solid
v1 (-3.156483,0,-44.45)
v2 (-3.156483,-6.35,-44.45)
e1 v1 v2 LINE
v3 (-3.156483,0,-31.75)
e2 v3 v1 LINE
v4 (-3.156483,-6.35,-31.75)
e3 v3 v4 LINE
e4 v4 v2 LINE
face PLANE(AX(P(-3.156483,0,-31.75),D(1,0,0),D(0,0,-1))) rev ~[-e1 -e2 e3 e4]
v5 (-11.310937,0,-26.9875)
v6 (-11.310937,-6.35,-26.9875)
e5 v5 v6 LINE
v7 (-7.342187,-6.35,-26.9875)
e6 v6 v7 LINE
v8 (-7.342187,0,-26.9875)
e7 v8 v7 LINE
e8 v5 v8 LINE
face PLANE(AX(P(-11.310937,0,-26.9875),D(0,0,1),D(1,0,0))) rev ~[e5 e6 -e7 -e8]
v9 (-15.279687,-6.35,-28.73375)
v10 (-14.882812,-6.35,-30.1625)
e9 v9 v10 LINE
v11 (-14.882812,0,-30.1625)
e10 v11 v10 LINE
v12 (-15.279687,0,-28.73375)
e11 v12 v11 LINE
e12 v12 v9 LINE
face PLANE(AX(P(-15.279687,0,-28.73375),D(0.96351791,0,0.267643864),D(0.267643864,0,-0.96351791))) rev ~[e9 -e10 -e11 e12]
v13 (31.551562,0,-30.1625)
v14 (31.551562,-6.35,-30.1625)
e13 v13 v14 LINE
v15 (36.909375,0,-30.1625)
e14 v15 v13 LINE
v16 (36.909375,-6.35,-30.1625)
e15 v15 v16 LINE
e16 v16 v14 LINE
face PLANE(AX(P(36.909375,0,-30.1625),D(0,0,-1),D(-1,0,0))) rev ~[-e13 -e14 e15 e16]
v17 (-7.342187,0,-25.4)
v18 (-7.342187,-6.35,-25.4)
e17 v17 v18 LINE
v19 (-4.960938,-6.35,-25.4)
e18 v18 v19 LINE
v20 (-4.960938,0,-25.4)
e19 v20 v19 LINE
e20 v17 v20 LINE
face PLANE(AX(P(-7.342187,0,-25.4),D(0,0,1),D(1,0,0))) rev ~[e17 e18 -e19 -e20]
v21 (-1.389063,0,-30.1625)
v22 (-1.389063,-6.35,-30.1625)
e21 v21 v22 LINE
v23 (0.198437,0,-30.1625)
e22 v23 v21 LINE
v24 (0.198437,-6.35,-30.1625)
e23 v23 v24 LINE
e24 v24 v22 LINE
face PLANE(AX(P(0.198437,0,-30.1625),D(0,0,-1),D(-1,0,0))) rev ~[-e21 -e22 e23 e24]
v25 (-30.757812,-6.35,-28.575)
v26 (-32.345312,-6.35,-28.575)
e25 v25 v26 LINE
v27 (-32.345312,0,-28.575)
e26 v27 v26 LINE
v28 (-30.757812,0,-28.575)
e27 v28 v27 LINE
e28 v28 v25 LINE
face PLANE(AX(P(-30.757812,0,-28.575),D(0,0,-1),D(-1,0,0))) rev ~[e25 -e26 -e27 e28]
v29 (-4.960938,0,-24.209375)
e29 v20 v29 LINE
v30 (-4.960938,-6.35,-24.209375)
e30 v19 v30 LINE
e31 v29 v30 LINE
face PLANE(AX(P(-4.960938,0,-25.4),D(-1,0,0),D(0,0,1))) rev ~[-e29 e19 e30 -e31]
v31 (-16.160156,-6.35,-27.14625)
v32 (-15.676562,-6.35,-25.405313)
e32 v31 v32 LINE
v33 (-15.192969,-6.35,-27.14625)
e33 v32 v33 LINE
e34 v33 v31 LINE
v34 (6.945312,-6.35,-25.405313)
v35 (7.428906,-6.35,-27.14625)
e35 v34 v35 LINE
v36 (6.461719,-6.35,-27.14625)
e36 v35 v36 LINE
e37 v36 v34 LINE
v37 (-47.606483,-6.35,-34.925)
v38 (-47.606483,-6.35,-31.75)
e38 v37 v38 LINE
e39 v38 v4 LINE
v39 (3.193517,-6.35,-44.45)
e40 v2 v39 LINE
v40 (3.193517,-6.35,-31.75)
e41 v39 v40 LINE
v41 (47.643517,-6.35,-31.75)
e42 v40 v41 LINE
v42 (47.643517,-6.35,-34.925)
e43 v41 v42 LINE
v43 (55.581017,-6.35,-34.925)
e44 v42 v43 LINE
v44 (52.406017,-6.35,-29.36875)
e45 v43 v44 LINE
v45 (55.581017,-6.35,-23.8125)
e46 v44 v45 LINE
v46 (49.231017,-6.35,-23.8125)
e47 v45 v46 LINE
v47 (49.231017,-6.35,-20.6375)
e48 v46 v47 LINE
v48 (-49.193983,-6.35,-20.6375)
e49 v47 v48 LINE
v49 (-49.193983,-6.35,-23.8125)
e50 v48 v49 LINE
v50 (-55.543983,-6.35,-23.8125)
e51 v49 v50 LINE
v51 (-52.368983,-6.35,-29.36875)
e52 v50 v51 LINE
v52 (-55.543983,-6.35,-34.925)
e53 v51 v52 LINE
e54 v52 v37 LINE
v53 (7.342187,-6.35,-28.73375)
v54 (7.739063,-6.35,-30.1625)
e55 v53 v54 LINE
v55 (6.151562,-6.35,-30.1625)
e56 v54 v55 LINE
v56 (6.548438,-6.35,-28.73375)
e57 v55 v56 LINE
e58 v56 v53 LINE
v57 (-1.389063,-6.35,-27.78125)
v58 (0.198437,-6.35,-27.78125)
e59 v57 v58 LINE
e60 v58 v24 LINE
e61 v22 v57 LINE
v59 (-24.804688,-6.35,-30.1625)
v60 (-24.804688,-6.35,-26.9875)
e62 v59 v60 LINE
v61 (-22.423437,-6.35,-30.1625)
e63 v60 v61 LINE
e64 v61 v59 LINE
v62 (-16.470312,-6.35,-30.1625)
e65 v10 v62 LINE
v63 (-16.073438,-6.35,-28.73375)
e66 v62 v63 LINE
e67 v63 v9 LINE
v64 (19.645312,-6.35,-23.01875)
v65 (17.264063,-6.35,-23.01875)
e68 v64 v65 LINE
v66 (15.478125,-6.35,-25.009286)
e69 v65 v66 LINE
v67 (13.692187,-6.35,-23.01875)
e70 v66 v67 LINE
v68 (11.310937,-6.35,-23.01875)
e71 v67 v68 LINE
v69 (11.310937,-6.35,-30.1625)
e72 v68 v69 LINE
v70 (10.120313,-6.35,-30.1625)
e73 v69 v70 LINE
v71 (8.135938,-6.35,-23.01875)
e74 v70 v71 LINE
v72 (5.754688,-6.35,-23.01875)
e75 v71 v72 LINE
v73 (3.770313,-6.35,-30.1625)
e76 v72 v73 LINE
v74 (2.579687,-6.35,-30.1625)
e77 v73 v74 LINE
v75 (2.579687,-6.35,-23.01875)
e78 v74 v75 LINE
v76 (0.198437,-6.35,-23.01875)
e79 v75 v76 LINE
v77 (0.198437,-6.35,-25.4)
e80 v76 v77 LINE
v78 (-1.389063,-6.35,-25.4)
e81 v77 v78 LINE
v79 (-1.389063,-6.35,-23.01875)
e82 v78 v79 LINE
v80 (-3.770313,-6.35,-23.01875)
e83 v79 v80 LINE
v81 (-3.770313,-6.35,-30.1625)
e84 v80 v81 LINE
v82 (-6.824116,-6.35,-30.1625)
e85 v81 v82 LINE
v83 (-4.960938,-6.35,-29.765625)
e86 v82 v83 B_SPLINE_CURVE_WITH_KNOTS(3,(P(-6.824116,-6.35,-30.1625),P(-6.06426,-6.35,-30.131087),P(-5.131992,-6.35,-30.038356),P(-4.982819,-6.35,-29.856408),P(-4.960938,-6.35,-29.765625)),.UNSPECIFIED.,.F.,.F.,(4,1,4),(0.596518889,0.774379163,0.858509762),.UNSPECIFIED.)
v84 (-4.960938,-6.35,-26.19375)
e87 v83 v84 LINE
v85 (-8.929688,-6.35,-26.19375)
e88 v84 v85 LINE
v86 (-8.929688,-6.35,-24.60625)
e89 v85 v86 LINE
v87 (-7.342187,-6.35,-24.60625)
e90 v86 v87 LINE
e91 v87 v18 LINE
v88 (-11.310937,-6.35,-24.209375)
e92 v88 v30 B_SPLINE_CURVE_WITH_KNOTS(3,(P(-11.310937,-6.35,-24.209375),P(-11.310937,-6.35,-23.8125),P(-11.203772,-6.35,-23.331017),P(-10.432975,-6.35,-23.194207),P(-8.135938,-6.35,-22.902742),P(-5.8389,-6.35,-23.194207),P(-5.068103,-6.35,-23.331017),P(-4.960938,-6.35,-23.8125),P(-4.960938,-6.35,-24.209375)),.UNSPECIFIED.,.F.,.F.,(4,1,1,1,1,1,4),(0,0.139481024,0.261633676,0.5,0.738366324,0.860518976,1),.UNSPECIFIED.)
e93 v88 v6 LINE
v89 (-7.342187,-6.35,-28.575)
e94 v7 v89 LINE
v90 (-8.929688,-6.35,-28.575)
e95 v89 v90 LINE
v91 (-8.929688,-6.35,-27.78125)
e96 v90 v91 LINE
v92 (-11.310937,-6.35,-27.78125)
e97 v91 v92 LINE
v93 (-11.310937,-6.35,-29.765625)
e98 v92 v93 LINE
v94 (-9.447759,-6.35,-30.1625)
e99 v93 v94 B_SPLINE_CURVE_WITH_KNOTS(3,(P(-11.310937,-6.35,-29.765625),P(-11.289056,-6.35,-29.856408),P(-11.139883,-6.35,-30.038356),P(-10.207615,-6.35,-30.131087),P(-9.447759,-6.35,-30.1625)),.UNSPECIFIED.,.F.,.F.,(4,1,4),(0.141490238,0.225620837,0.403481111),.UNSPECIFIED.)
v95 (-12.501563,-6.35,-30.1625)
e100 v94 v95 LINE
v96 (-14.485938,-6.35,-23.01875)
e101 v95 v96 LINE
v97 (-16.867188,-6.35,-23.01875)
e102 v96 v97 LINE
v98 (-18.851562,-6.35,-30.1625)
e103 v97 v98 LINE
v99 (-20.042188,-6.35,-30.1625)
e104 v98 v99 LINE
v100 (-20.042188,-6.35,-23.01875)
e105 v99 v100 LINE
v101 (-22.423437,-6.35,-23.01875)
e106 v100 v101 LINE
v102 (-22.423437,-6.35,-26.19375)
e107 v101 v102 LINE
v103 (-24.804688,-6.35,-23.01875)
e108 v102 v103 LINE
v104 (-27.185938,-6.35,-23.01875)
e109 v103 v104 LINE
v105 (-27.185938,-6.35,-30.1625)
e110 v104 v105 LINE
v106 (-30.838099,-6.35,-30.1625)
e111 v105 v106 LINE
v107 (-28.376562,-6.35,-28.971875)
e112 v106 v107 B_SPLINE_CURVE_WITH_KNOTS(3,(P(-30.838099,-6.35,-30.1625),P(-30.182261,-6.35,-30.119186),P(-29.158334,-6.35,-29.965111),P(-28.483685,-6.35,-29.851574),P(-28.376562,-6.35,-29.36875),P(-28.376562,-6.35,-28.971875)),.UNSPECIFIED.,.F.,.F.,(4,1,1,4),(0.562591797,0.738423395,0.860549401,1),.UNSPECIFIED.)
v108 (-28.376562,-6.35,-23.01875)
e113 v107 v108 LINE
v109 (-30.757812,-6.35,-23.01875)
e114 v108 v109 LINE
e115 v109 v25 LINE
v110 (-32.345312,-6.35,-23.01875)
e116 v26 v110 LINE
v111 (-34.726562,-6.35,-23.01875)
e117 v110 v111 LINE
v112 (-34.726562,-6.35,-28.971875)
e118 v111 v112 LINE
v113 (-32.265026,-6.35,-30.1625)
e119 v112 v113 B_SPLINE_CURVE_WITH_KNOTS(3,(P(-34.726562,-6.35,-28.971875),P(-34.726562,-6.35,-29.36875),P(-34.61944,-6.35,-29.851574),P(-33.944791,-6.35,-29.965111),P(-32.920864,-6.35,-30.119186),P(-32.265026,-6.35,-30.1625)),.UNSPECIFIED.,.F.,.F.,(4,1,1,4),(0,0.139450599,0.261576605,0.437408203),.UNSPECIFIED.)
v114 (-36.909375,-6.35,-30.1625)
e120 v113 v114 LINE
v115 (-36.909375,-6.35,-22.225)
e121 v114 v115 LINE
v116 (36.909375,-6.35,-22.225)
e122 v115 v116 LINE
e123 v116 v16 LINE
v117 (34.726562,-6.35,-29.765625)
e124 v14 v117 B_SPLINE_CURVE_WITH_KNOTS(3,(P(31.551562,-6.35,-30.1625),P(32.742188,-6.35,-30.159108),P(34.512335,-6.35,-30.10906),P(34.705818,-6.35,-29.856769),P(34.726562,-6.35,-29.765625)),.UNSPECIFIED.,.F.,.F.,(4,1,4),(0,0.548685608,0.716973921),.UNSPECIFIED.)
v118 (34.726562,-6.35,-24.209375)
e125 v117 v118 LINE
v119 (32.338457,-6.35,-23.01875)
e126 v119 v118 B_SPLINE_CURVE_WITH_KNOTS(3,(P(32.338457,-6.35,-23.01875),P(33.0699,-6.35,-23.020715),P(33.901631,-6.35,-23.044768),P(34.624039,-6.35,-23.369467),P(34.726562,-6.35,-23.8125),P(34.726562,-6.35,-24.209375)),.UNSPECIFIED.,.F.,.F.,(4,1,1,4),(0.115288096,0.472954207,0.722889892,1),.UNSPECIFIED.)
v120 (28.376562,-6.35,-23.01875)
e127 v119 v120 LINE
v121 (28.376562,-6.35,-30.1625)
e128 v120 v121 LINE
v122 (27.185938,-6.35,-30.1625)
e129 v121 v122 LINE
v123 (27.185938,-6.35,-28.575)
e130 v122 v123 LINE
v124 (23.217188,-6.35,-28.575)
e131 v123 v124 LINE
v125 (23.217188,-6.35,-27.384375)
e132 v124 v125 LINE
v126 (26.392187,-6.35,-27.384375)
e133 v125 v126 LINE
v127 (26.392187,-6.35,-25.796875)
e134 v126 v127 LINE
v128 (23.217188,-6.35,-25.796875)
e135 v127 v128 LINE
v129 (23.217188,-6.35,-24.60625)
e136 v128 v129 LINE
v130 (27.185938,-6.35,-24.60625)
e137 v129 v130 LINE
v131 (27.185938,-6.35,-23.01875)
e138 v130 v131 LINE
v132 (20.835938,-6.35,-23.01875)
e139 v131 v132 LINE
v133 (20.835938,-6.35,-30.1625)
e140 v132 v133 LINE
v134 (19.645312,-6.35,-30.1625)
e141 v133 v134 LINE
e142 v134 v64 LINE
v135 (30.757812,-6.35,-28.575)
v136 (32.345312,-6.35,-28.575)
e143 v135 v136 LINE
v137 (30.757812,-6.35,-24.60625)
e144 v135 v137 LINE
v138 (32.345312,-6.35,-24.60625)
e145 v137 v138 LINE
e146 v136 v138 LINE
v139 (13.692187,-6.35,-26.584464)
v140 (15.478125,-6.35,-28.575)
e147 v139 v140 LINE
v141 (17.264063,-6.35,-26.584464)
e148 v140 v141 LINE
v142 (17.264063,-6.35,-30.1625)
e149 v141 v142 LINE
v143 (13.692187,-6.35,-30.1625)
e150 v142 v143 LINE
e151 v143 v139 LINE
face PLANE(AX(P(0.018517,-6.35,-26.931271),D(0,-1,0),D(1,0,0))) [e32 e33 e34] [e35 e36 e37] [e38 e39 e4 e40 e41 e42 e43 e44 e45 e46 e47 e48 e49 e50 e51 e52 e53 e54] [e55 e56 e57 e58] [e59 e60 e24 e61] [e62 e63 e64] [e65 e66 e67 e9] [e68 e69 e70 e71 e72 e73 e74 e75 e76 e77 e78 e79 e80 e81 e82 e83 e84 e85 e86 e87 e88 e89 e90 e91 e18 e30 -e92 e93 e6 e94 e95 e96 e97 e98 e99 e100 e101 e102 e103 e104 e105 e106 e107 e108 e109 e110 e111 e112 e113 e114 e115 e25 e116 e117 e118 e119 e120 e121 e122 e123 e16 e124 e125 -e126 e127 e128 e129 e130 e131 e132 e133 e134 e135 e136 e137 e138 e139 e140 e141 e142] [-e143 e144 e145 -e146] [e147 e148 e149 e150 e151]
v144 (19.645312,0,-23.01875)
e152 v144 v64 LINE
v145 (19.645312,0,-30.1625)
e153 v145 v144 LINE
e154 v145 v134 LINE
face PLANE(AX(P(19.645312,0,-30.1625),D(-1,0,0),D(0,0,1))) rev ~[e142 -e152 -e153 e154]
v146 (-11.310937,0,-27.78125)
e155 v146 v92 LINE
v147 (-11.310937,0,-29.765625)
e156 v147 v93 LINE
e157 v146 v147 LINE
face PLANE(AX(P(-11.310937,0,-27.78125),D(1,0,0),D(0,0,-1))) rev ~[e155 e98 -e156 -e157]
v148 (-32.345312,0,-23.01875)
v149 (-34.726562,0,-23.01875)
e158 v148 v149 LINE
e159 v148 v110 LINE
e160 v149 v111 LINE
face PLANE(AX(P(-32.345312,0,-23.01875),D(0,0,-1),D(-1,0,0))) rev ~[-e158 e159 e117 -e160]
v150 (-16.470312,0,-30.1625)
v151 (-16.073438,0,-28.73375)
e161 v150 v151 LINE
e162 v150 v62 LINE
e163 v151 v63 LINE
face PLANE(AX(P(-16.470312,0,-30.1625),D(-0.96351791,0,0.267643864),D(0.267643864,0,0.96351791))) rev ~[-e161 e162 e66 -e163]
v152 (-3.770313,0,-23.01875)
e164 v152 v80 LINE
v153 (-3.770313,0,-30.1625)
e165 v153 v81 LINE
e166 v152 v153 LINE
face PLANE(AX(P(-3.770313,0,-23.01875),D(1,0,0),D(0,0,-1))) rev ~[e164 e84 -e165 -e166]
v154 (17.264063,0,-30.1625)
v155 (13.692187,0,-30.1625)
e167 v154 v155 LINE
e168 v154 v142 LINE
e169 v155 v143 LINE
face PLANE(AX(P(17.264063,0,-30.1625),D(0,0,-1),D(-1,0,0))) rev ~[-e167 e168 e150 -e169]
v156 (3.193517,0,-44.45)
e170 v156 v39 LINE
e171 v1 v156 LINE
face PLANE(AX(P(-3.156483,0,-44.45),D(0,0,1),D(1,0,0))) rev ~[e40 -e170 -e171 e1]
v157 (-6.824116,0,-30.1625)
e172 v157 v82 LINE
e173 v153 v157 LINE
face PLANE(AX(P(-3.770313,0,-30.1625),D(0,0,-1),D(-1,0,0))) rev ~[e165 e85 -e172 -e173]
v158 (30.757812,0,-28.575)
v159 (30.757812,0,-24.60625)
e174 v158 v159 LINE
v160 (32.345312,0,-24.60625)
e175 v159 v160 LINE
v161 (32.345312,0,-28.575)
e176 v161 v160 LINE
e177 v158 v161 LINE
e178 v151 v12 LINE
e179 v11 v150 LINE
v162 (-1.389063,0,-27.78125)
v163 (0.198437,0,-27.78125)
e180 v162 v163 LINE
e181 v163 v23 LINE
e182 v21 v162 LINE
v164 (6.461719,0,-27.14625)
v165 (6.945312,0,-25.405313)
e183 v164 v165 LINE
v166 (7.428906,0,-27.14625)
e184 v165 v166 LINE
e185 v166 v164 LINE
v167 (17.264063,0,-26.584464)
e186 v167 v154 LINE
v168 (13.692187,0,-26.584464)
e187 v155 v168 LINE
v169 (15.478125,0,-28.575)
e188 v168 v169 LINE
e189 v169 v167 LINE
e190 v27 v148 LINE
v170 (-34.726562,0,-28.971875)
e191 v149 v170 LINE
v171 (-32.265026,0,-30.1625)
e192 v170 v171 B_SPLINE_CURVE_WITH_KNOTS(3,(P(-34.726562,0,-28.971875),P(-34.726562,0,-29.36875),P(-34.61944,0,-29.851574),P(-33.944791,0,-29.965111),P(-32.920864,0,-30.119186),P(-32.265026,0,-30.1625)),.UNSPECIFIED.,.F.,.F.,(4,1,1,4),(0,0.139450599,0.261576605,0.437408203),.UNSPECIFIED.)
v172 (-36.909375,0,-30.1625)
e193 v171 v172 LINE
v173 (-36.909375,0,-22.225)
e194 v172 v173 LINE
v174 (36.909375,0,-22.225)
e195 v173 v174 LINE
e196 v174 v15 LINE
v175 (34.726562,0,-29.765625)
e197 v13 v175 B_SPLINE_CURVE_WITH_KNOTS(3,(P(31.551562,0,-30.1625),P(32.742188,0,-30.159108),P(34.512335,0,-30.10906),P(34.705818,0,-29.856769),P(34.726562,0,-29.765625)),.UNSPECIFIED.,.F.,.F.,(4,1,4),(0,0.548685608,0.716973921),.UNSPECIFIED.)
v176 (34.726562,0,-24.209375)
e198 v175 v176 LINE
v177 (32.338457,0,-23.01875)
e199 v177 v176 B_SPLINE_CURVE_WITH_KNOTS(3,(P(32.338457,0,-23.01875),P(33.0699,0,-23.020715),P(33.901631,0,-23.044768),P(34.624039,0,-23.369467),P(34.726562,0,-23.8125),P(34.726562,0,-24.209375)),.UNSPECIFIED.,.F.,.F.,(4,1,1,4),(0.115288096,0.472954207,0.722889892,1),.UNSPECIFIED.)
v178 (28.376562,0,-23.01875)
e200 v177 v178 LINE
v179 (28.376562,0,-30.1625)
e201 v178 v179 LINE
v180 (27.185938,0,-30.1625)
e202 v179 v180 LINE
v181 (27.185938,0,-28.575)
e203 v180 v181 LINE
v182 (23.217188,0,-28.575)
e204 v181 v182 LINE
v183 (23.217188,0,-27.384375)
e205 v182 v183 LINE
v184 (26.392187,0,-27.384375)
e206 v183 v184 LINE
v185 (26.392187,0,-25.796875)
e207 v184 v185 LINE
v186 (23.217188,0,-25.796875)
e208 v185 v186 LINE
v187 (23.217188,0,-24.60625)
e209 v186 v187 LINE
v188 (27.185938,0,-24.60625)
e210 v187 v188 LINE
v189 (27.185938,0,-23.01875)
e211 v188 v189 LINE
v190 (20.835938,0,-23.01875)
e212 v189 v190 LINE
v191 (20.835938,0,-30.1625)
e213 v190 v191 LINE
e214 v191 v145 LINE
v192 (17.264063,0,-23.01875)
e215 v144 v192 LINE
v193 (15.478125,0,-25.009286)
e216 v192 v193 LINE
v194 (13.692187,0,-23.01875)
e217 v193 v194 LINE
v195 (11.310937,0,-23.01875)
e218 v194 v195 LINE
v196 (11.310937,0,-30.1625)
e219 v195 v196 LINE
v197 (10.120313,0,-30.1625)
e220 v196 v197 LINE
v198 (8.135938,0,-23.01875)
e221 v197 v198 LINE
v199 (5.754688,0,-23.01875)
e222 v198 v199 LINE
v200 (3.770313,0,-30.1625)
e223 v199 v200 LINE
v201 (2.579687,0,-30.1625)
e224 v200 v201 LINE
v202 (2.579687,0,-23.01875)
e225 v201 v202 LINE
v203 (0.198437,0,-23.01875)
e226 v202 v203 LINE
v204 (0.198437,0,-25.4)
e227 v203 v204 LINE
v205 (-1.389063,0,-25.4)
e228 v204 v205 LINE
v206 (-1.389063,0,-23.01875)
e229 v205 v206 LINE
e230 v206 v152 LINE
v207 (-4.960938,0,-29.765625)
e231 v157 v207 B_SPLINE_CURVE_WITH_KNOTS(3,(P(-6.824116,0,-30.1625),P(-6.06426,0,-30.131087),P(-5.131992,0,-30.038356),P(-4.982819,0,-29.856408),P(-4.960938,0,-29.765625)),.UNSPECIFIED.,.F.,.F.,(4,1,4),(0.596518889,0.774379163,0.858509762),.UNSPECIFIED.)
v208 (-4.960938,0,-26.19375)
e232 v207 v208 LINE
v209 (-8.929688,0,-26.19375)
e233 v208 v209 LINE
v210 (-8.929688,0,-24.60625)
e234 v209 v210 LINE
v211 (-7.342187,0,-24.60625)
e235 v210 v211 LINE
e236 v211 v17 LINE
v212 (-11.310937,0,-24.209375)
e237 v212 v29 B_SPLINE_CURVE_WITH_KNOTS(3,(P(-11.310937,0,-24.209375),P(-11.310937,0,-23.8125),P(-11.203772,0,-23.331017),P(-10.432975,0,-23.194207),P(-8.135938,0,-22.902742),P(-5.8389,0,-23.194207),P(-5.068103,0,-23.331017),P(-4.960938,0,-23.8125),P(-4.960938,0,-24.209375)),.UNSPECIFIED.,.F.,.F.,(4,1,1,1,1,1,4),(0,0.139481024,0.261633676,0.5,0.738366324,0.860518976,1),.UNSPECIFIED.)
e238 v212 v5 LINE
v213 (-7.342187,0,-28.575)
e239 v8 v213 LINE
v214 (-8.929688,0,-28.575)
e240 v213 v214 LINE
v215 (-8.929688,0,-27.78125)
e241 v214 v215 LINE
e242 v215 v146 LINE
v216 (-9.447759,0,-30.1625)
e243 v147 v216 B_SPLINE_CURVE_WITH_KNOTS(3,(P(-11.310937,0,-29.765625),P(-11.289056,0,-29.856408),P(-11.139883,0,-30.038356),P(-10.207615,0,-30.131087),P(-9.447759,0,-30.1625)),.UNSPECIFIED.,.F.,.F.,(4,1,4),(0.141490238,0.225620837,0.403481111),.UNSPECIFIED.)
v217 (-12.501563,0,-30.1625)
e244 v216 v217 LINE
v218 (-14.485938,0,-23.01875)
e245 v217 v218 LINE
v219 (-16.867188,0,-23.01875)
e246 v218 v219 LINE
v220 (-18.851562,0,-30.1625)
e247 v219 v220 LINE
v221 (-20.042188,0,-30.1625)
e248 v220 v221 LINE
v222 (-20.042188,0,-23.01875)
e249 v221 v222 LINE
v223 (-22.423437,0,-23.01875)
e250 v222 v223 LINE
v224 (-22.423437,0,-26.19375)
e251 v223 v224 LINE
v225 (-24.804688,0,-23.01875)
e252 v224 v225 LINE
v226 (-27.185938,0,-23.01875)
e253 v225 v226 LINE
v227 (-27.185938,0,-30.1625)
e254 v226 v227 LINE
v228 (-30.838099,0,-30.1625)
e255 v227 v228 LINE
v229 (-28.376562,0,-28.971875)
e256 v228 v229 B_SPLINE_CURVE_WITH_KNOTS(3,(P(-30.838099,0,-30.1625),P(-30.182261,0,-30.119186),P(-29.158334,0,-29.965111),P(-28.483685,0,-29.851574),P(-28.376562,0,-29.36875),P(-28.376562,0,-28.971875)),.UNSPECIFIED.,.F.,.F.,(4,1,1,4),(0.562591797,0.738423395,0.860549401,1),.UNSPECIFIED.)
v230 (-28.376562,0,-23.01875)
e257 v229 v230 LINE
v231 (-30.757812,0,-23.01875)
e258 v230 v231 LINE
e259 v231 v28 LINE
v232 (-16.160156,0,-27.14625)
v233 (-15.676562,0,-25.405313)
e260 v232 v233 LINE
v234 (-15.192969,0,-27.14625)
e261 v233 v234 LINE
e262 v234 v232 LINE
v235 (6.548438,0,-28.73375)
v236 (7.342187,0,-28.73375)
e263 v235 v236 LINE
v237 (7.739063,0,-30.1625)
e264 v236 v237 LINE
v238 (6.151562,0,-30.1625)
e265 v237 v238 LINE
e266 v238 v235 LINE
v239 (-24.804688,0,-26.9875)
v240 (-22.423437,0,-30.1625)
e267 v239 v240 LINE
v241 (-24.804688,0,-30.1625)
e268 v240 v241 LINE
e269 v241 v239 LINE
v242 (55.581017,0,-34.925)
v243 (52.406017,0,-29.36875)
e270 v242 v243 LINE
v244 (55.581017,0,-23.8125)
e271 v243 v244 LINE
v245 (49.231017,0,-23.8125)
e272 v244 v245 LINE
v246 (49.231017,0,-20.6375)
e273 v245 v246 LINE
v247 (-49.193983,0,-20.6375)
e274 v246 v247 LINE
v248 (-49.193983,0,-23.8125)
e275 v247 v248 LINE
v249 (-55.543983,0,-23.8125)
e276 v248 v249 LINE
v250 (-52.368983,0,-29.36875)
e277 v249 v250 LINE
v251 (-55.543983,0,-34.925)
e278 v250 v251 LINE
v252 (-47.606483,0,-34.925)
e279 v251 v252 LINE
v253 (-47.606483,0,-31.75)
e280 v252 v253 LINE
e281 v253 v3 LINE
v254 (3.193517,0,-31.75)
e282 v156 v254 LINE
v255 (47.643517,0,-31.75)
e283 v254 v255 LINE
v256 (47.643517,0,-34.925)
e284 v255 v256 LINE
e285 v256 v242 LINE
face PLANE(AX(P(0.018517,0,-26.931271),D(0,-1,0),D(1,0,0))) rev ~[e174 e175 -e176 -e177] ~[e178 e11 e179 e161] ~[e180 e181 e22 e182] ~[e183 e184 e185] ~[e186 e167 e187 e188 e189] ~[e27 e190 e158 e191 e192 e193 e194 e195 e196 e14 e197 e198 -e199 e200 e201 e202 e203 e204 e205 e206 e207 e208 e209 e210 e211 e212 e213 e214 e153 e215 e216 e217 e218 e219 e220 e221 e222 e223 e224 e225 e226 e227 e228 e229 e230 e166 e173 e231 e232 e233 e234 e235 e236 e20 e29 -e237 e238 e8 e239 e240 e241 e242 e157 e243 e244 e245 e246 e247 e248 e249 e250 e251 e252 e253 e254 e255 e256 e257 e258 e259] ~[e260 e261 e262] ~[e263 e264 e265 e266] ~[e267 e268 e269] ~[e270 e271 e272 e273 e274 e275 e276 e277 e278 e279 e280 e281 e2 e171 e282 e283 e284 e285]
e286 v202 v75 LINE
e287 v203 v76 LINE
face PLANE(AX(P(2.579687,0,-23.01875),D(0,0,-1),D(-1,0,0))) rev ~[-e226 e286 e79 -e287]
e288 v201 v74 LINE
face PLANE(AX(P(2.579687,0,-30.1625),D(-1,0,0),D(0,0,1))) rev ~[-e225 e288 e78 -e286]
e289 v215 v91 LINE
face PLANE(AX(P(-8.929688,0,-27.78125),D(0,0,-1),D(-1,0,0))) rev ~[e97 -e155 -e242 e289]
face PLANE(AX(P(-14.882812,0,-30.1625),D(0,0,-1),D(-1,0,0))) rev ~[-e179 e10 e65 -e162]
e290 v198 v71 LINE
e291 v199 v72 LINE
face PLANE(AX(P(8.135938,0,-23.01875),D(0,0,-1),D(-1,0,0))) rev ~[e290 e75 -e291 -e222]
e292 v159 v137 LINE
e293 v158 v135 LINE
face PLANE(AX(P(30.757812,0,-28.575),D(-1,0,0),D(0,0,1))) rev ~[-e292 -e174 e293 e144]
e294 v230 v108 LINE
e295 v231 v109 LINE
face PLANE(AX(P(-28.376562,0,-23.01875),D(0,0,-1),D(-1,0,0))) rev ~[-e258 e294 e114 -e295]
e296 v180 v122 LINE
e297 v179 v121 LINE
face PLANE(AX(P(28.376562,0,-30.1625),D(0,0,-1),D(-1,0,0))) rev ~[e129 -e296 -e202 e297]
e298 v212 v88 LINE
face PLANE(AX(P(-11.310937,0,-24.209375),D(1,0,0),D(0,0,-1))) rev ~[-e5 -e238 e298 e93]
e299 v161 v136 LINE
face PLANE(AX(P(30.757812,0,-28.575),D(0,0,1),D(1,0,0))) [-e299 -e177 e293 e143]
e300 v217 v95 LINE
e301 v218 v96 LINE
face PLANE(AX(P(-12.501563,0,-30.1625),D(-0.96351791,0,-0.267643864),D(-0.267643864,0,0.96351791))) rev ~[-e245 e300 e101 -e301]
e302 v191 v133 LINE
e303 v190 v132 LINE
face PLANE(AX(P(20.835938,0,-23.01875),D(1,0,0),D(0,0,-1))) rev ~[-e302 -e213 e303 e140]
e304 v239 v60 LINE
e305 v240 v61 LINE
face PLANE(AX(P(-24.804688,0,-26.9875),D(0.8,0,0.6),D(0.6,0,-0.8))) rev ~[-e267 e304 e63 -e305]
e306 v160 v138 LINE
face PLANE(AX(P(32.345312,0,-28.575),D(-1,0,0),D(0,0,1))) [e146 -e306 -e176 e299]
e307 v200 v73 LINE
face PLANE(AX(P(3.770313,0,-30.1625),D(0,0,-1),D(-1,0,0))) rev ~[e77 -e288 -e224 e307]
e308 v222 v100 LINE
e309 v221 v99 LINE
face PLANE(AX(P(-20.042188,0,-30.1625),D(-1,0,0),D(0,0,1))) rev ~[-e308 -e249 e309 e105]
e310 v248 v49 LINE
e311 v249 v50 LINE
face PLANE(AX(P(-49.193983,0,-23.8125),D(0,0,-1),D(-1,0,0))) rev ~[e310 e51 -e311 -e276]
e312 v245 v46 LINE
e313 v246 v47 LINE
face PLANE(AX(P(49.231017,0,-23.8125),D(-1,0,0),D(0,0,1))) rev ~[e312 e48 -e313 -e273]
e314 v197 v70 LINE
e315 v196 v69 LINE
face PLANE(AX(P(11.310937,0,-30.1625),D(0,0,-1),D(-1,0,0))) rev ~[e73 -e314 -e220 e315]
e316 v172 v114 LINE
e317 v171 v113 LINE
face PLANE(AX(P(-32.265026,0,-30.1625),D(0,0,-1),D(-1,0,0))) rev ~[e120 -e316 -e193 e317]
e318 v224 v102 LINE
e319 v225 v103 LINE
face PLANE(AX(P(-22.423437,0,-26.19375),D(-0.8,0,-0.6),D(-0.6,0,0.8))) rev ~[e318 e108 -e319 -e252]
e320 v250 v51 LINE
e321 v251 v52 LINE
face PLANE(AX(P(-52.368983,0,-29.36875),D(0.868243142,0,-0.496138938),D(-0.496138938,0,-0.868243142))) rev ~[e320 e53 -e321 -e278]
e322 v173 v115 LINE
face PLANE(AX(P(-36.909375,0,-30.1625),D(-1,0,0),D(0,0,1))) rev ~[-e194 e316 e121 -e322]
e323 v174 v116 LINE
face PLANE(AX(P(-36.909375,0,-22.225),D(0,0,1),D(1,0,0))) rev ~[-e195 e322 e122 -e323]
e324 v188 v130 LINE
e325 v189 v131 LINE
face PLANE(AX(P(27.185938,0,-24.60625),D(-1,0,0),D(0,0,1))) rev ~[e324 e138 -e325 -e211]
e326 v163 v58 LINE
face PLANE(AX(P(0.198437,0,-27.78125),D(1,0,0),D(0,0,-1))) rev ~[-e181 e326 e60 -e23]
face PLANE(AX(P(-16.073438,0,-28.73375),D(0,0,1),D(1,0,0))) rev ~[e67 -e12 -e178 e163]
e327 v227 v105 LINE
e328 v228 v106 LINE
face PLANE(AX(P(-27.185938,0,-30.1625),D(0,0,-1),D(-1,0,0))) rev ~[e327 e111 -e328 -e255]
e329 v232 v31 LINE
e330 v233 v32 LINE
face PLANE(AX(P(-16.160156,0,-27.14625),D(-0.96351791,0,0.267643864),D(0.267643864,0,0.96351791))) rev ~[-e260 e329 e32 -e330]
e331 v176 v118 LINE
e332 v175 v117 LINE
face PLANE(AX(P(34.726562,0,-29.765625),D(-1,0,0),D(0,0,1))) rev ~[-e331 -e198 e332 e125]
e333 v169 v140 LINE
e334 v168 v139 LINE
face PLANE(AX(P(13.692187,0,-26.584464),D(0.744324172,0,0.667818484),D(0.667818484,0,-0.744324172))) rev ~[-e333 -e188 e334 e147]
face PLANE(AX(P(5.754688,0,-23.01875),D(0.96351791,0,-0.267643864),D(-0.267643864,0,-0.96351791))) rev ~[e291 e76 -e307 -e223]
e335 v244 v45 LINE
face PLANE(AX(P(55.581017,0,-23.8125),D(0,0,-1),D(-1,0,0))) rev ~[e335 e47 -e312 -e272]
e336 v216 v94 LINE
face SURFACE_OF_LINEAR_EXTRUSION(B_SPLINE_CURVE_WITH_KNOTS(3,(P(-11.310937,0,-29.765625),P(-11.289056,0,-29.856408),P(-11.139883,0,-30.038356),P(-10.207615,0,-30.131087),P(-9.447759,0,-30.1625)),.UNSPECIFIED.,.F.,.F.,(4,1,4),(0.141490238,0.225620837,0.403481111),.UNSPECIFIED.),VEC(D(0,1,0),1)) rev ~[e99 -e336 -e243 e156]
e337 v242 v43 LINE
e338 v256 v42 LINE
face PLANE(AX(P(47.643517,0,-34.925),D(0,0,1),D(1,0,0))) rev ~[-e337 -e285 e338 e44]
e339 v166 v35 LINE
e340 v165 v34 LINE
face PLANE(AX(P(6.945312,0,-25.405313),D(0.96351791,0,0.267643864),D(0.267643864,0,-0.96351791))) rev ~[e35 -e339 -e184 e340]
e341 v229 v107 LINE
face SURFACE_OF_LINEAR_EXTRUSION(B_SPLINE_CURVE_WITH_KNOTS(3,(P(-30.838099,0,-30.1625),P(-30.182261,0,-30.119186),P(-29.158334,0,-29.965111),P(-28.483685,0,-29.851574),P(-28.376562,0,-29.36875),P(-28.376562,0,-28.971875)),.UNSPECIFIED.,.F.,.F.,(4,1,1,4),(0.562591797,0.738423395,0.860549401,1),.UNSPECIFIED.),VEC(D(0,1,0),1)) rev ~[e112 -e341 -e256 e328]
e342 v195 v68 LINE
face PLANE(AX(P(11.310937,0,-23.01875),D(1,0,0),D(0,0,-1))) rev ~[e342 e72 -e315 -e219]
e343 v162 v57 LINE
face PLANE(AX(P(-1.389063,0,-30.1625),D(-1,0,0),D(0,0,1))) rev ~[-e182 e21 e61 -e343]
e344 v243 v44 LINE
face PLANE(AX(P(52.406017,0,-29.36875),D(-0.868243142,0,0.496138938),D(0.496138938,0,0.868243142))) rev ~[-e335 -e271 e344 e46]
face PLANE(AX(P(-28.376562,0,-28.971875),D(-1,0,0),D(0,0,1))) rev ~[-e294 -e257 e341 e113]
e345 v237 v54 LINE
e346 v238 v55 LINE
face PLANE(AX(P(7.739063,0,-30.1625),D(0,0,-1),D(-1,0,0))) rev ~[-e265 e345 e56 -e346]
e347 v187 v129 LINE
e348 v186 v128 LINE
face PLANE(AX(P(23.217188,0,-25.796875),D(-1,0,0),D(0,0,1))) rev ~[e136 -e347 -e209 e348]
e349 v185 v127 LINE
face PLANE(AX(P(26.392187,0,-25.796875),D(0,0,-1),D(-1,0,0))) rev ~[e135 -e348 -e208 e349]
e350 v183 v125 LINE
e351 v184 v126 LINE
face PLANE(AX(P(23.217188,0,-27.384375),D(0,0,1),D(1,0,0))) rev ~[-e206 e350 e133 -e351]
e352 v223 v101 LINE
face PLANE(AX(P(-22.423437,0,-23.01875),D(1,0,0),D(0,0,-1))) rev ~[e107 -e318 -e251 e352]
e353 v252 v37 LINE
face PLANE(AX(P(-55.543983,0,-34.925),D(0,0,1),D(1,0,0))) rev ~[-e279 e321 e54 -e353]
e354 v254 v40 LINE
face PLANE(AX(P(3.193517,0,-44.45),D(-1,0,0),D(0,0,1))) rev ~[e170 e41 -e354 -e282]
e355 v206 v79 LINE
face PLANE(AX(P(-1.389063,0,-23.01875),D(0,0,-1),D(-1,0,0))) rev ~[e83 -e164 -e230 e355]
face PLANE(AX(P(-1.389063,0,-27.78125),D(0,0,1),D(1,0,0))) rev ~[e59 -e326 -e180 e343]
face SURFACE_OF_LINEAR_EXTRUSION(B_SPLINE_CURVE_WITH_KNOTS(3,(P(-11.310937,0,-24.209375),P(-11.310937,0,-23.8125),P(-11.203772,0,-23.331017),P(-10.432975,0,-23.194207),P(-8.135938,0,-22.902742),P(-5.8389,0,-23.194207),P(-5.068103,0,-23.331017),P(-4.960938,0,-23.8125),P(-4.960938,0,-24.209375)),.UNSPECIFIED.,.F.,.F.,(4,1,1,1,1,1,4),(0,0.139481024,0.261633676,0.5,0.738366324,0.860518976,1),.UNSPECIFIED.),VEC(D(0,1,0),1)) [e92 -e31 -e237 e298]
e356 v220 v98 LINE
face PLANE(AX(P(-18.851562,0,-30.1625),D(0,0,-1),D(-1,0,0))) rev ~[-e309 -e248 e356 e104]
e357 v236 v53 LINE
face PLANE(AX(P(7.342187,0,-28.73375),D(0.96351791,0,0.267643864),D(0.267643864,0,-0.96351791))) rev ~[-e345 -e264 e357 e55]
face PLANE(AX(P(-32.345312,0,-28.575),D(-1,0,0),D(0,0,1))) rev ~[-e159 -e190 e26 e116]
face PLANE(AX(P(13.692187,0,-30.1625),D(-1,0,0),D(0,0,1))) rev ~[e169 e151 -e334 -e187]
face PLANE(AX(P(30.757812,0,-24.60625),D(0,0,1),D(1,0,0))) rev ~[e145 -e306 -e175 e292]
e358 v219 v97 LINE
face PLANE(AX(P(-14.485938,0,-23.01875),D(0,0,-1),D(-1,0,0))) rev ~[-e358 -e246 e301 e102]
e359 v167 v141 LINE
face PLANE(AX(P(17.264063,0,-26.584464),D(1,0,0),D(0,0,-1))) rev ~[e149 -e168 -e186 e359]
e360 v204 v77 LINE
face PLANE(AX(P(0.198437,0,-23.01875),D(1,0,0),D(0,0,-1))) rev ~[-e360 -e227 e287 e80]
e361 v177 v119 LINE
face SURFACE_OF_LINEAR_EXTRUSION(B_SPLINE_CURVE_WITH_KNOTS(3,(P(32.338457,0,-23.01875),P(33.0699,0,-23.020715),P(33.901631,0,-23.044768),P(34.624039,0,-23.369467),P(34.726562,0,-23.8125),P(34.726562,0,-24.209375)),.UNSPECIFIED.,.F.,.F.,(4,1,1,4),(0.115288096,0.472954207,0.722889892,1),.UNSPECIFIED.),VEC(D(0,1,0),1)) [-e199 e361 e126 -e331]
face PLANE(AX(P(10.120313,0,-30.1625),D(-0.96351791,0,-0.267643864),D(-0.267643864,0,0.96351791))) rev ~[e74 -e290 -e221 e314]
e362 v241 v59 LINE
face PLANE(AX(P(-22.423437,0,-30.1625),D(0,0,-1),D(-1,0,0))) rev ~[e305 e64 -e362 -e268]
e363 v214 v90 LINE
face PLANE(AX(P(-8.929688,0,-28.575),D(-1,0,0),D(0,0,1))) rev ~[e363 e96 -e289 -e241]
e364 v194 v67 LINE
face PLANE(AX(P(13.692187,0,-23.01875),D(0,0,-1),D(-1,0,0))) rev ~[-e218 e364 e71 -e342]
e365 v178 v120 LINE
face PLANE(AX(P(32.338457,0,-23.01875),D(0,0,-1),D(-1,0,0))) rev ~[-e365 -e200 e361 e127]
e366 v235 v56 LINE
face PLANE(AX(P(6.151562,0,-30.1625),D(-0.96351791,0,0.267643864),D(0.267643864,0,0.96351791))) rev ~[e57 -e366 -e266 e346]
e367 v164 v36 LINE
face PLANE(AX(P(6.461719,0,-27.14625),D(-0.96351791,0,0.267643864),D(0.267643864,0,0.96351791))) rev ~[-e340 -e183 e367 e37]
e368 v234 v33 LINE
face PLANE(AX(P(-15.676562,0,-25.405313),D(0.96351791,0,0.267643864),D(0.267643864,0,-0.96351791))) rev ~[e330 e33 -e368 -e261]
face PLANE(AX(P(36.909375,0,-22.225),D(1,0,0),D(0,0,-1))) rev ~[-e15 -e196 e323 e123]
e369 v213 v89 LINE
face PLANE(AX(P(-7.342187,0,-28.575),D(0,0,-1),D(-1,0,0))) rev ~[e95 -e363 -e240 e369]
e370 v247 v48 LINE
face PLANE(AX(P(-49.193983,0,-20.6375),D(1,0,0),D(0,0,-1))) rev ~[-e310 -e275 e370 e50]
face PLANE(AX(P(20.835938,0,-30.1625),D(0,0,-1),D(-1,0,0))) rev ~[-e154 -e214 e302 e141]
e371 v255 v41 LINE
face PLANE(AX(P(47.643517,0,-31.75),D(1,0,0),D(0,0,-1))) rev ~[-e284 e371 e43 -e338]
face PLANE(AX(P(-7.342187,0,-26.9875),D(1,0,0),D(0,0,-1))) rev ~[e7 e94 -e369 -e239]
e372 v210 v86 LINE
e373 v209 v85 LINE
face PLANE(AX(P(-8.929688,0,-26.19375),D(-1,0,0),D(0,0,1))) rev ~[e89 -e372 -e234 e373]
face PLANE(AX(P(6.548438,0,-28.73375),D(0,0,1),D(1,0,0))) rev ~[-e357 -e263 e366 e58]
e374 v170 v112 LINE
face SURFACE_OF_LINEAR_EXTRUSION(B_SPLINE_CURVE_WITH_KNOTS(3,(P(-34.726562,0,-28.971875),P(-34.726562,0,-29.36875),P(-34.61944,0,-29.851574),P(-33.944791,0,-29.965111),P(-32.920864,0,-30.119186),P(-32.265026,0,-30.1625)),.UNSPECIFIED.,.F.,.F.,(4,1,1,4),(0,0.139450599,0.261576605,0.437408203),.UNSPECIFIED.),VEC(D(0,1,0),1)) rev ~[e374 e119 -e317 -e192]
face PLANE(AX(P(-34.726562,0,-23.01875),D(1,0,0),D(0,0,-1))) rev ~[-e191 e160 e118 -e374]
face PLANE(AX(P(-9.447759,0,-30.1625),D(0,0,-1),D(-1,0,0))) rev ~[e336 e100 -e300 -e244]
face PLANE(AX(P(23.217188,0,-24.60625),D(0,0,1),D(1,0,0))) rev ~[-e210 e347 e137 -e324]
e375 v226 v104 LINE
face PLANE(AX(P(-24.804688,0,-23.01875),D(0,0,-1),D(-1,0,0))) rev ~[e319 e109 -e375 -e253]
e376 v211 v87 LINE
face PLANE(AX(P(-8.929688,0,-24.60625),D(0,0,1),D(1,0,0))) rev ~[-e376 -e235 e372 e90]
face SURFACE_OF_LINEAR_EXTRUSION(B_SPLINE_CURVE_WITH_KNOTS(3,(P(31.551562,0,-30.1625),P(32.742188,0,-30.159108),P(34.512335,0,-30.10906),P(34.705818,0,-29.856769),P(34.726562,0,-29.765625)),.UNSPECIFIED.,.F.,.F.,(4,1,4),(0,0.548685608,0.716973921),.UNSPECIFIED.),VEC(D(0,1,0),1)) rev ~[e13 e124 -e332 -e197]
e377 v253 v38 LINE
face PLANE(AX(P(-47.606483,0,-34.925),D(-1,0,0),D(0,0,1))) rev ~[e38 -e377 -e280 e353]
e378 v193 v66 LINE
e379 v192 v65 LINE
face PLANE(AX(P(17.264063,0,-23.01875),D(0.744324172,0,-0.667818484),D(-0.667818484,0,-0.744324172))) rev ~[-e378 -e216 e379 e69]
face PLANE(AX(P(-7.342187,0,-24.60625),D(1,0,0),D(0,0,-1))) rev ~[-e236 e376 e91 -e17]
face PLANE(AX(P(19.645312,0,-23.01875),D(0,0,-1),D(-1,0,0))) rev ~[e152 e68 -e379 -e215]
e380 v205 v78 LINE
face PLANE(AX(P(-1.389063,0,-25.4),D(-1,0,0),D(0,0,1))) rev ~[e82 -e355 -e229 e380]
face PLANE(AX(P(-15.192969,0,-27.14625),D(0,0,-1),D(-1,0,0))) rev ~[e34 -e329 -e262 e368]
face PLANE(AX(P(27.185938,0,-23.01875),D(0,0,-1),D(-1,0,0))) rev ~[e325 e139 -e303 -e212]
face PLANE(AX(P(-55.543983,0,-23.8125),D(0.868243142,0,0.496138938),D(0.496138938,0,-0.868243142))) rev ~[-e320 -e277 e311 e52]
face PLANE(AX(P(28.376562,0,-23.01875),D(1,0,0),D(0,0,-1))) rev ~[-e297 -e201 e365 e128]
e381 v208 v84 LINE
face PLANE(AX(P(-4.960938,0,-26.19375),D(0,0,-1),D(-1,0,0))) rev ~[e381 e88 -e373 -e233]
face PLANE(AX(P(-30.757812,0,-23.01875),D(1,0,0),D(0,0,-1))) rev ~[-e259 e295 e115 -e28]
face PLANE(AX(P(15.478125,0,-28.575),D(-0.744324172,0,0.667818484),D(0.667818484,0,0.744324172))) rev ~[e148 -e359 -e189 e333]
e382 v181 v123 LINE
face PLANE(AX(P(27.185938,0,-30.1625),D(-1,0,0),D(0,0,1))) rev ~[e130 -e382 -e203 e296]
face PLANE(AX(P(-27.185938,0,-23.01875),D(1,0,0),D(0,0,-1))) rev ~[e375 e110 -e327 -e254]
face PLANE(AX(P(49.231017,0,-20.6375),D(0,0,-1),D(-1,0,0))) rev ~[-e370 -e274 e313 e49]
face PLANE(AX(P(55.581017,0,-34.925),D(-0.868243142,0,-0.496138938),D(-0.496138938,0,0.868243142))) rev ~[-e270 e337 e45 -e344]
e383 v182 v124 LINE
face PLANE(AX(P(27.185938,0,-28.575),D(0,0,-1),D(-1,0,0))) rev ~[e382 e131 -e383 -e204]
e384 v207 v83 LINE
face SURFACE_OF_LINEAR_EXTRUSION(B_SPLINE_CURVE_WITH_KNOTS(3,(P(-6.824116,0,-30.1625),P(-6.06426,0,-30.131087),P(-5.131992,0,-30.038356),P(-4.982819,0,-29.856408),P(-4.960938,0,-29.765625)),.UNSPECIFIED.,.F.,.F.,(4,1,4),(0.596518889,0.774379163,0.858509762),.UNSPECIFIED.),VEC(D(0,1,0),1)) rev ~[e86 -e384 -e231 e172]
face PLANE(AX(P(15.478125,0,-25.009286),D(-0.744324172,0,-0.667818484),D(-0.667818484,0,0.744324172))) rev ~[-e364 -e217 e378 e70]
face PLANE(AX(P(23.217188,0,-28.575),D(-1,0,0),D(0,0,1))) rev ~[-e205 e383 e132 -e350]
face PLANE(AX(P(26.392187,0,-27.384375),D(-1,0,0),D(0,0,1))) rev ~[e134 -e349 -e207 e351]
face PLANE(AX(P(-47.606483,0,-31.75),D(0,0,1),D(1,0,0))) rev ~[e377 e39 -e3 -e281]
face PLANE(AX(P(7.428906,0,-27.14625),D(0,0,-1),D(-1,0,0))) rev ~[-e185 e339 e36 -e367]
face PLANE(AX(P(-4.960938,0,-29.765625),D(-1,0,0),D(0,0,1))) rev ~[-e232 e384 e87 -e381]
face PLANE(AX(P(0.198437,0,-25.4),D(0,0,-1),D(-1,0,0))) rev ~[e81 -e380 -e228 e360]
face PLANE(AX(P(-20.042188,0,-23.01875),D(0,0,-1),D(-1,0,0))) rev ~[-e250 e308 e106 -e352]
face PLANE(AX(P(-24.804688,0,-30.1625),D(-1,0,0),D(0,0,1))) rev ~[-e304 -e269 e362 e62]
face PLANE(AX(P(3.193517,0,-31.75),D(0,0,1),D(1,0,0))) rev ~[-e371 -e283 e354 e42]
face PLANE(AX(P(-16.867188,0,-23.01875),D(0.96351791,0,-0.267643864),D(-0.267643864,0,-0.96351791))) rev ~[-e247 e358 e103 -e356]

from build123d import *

# Parameters (mm, degrees)
F0_W     = 6.35
F0_H     = 9.525
F0_W_2   = 1.5875
F0_H_2   = 3.96875
F0_H_3   = 3.175
F1_DEPTH = 6.35


# Not quite as in the source:
# - a length typed as a fraction of an inch, garbled in the dataset ("3 / 203.2 mm" for 3/8 in), is restored


with BuildPart() as f1:
    # F0 (on Front) → F1 (new body)
    with BuildSketch(Plane.XZ):
        Polygon((52.4060167908, -29.36875), (55.5810167908, -23.8125), (49.2310167908, -23.8125), (49.2310167908, -20.6375), (-49.1939832092, -20.6375), (-49.1939832092, -23.8125), (-55.5439832092, -23.8125), (-52.3689832092, -29.36875), (-55.5439832092, -34.925), (-47.6064832092, -34.925), (-47.6064832092, -31.75), (-3.1564832092, -31.75), (3.1935167908, -31.75), (47.6435167908, -31.75), (47.6435167908, -34.925), (55.5810167908, -34.925), align=None)
        with BuildLine():
            Line((-36.909375, -22.225), (36.909375, -22.225))
            Line((36.909375, -22.225), (36.909375, -30.1625))
            Line((36.909375, -30.1625), (34.7265625, -30.1625))
            Line((34.7265625, -30.1625), (31.5515625, -30.1625))
            Line((31.5515625, -30.1625), (28.3765625, -30.1625))
            Line((28.3765625, -30.1625), (27.1859375, -30.1625))
            Line((27.1859375, -30.1625), (20.8359375, -30.1625))
            Line((20.8359375, -30.1625), (19.6453125, -30.1625))
            Line((19.6453125, -30.1625), (17.2640625, -30.1625))
            Line((17.2640625, -30.1625), (13.6921875, -30.1625))
            Line((13.6921875, -30.1625), (11.3109375, -30.1625))
            Line((11.3109375, -30.1625), (10.1203125, -30.1625))
            Line((10.1203125, -30.1625), (7.7390625, -30.1625))
            Line((7.7390625, -30.1625), (6.1515625, -30.1625))
            Line((6.1515625, -30.1625), (3.7703125, -30.1625))
            Line((3.7703125, -30.1625), (2.5796875, -30.1625))
            Line((2.5796875, -30.1625), (0.1984375, -30.1625))
            Line((0.1984375, -30.1625), (-1.3890625, -30.1625))
            Line((-1.3890625, -30.1625), (-3.7703125, -30.1625))
            Line((-3.7703125, -30.1625), (-4.9609375, -30.1625))
            Line((-4.9609375, -30.1625), (-6.8241157772, -30.1625))
            add(Edge.make_bspline(
                [(-8.1359375, -30.1873046875), (-7.6862010464, -30.1873046875), (-7.2364645928, -30.1795465798), (-6.8241157772, -30.1625)],
                knots=[0.5, 0.5, 0.5, 0.5, 0.5965188889, 0.5965188889, 0.5965188889, 0.5965188889], degree=3))
            add(Edge.make_bspline(
                [(-9.4477592243, -30.1625), (-9.0354104083, -30.1795465799), (-8.5856739541, -30.1873046875), (-8.1359375, -30.1873046875)],
                knots=[0.403481111, 0.403481111, 0.403481111, 0.403481111, 0.5, 0.5, 0.5, 0.5], degree=3))
            Line((-9.4477592243, -30.1625), (-11.3109375, -30.1625))
            Line((-11.3109375, -30.1625), (-12.5015625, -30.1625))
            Line((-12.5015625, -30.1625), (-14.8828125, -30.1625))
            Line((-14.8828125, -30.1625), (-16.4703125, -30.1625))
            Line((-16.4703125, -30.1625), (-18.8515625, -30.1625))
            Line((-18.8515625, -30.1625), (-20.0421875, -30.1625))
            Line((-20.0421875, -30.1625), (-22.4234375, -30.1625))
            Line((-22.4234375, -30.1625), (-24.8046875, -30.1625))
            Line((-24.8046875, -30.1625), (-27.1859375, -30.1625))
            Line((-27.1859375, -30.1625), (-28.3765625, -30.1625))
            Line((-28.3765625, -30.1625), (-30.8380988479, -30.1625))
            add(Edge.make_bspline(
                [(-31.5515625, -30.1873046875), (-31.3115619086, -30.1873046875), (-31.0715613172, -30.1779187981), (-30.8380988479, -30.1625)],
                knots=[0.5, 0.5, 0.5, 0.5, 0.5625917967, 0.5625917967, 0.5625917967, 0.5625917967], degree=3))
            add(Edge.make_bspline(
                [(-32.2650261503, -30.1625), (-32.0315636815, -30.177918798), (-31.7915630907, -30.1873046875), (-31.5515625, -30.1873046875)],
                knots=[0.4374082034, 0.4374082034, 0.4374082034, 0.4374082034, 0.5, 0.5, 0.5, 0.5], degree=3))
            Line((-32.2650261503, -30.1625), (-34.7265625, -30.1625))
            Line((-34.7265625, -30.1625), (-36.909375, -30.1625))
            Line((-36.909375, -30.1625), (-36.909375, -22.225))
        make_face(mode=Mode.SUBTRACT)
        with Locations((0.0185167908, -39.6875)):
            Rectangle(F0_W, F0_H)
        Polygon((17.2640625, -30.1625), (19.6453125, -30.1625), (19.6453125, -23.01875), (17.2640625, -23.01875), (15.478125, -25.0092855764), (13.6921875, -23.01875), (11.3109375, -23.01875), (11.3109375, -30.1625), (13.6921875, -30.1625), (13.6921875, -26.5844644236), (15.478125, -28.575), (17.2640625, -26.5844644236), align=None)
        with BuildLine():
            Line((28.3765625, -30.1625), (31.5515625, -30.1625))
            add(Edge.make_bspline(
                [(31.5515625, -30.1625), (32.7421875004, -30.1591077376), (34.5123349703, -30.1090597393), (34.7058178423, -29.8567694785), (34.7265625, -29.765625)],
                knots=[0, 0, 0, 0, 0.5486856078, 0.7169739211, 0.7169739211, 0.7169739211, 0.7169739211], degree=3))
            Line((34.7265625, -29.765625), (34.7265625, -28.971875))
            Line((34.7265625, -28.971875), (34.7265625, -24.209375))
            add(Edge.make_bspline(
                [(32.338456939, -23.01875), (33.0698998056, -23.0207151841), (33.9016308923, -23.0447678149), (34.6240389102, -23.3694667004), (34.7265625, -23.8125000002), (34.7265625, -24.209375)],
                knots=[0.1152880959, 0.1152880959, 0.1152880959, 0.1152880959, 0.4729542068, 0.722889892, 1, 1, 1, 1], degree=3))
            Line((32.338456939, -23.01875), (31.5515625, -23.01875))
            Line((31.5515625, -23.01875), (28.3765625, -23.01875))
            Line((28.3765625, -23.01875), (28.3765625, -30.1625))
        make_face()
        with Locations((31.5515625, -26.590625)):
            Rectangle(F0_W_2, F0_H_2, mode=Mode.SUBTRACT)
        Polygon((-27.1859375, -23.01875), (-27.1859375, -30.1625), (-24.8046875, -30.1625), (-24.8046875, -26.9875), (-22.4234375, -30.1625), (-20.0421875, -30.1625), (-20.0421875, -23.01875), (-22.4234375, -23.01875), (-22.4234375, -26.19375), (-24.8046875, -23.01875), align=None)
        Polygon((0.1984375, -30.1625), (2.5796875, -30.1625), (2.5796875, -23.01875), (0.1984375, -23.01875), (0.1984375, -25.4), (-1.3890625, -25.4), (-1.3890625, -23.01875), (-3.7703125, -23.01875), (-3.7703125, -30.1625), (-1.3890625, -30.1625), (-1.3890625, -27.78125), (0.1984375, -27.78125), align=None)
        with BuildLine():
            add(Edge.make_bspline(
                [(-34.7265625, -28.971875), (-34.7265625, -29.3687499998), (-34.6194398399, -29.8515743848), (-33.9447907089, -29.9651114553), (-32.920864157, -30.119185827), (-32.2650261503, -30.1625)],
                knots=[0, 0, 0, 0, 0.139450599, 0.2615766049, 0.4374082034, 0.4374082034, 0.4374082034, 0.4374082034], degree=3))
            Line((-32.2650261503, -30.1625), (-31.5515625, -30.1625))
            Line((-31.5515625, -30.1625), (-30.8380988479, -30.1625))
            add(Edge.make_bspline(
                [(-30.8380988479, -30.1625), (-30.1822608419, -30.119185827), (-29.1583342909, -29.9651114555), (-28.4836851601, -29.851574384), (-28.3765625, -29.3687500019), (-28.3765625, -28.971875)],
                knots=[0.5625917967, 0.5625917967, 0.5625917967, 0.5625917967, 0.7384233951, 0.860549401, 1, 1, 1, 1], degree=3))
            Line((-28.3765625, -28.971875), (-28.3765625, -23.01875))
            Line((-28.3765625, -23.01875), (-30.7578125, -23.01875))
            Line((-30.7578125, -23.01875), (-30.7578125, -28.575))
            Line((-30.7578125, -28.575), (-32.3453125, -28.575))
            Line((-32.3453125, -28.575), (-32.3453125, -23.01875))
            Line((-32.3453125, -23.01875), (-34.7265625, -23.01875))
            Line((-34.7265625, -23.01875), (-34.7265625, -28.971875))
        make_face()
        with BuildLine():
            add(Edge.make_bspline(
                [(-11.3109375, -29.765625), (-11.2890563147, -29.8564083098), (-11.1398834343, -30.0383555662), (-10.2076153949, -30.1310873988), (-9.4477592243, -30.1625)],
                knots=[0.1414902381, 0.1414902381, 0.1414902381, 0.1414902381, 0.2256208371, 0.403481111, 0.403481111, 0.403481111, 0.403481111], degree=3))
            Line((-9.4477592243, -30.1625), (-8.1359375, -30.1625))
            Line((-8.1359375, -30.1625), (-6.8241157772, -30.1625))
            add(Edge.make_bspline(
                [(-6.8241157772, -30.1625), (-6.0642596059, -30.1310873988), (-5.1319915657, -30.0383555662), (-4.9828186853, -29.8564083099), (-4.9609375, -29.765625)],
                knots=[0.5965188889, 0.5965188889, 0.5965188889, 0.5965188889, 0.7743791629, 0.8585097619, 0.8585097619, 0.8585097619, 0.8585097619], degree=3))
            Line((-4.9609375, -29.765625), (-4.9609375, -28.971875))
            Line((-4.9609375, -28.971875), (-4.9609375, -26.19375))
            Line((-4.9609375, -26.19375), (-8.9296875, -26.19375))
            Line((-8.9296875, -26.19375), (-8.9296875, -24.60625))
            Line((-8.9296875, -24.60625), (-7.3421875, -24.60625))
            Line((-7.3421875, -24.60625), (-7.3421875, -25.4))
            Line((-7.3421875, -25.4), (-4.9609375, -25.4))
            Line((-4.9609375, -25.4), (-4.9609375, -24.209375))
            add(Edge.make_bspline(
                [(-8.1359375, -23.01875), (-7.2216783904, -23.0187499999), (-5.8389001857, -23.1942073937), (-5.0681026979, -23.3310171279), (-4.9609375, -23.8124999986), (-4.9609375, -24.209375)],
                knots=[0.5, 0.5, 0.5, 0.5, 0.738366324, 0.8605189755, 1, 1, 1, 1], degree=3))
            add(Edge.make_bspline(
                [(-11.3109375, -24.209375), (-11.3109375, -23.8125000002), (-11.2037723021, -23.3310171272), (-10.4329748143, -23.194207394), (-9.0501966096, -23.0187500001), (-8.1359375, -23.01875)],
                knots=[0, 0, 0, 0, 0.1394810245, 0.261633676, 0.5, 0.5, 0.5, 0.5], degree=3))
            Line((-11.3109375, -24.209375), (-11.3109375, -26.9875))
            Line((-11.3109375, -26.9875), (-7.3421875, -26.9875))
            Line((-7.3421875, -26.9875), (-7.3421875, -28.575))
            Line((-7.3421875, -28.575), (-8.9296875, -28.575))
            Line((-8.9296875, -28.575), (-8.9296875, -27.78125))
            Line((-8.9296875, -27.78125), (-11.3109375, -27.78125))
            Line((-11.3109375, -27.78125), (-11.3109375, -28.971875))
            Line((-11.3109375, -28.971875), (-11.3109375, -29.765625))
        make_face()
        Polygon((20.8359375, -30.1625), (27.1859375, -30.1625), (27.1859375, -28.575), (23.2171875, -28.575), (23.2171875, -27.384375), (26.3921875, -27.384375), (26.3921875, -25.796875), (23.2171875, -25.796875), (23.2171875, -24.60625), (27.1859375, -24.60625), (27.1859375, -23.01875), (20.8359375, -23.01875), align=None)
        Polygon((-16.8671875, -23.01875), (-18.8515625, -30.1625), (-16.4703125, -30.1625), (-16.0734375, -28.73375), (-15.2796875, -28.73375), (-14.8828125, -30.1625), (-12.5015625, -30.1625), (-14.4859375, -23.01875), align=None)
        Polygon((-16.160156063, -27.14625), (-15.6765625, -25.4053131732), (-15.192968937, -27.14625), align=None, mode=Mode.SUBTRACT)
        Polygon((7.7390625, -30.1625), (10.1203125, -30.1625), (8.1359375, -23.01875), (5.7546875, -23.01875), (3.7703125, -30.1625), (6.1515625, -30.1625), (6.5484375, -28.73375), (7.3421875, -28.73375), align=None)
        Polygon((6.461718937, -27.14625), (6.9453125, -25.4053131732), (7.428906063, -27.14625), align=None, mode=Mode.SUBTRACT)
        with Locations((0.0185167908, -33.3375)):
            Rectangle(F0_W, F0_H_3)
        with BuildLine():
            Line((-8.1359375, -30.1625), (-9.4477592243, -30.1625))
            add(Edge.make_bspline(
                [(-9.4477592243, -30.1625), (-9.0354104083, -30.1795465799), (-8.5856739541, -30.1873046875), (-8.1359375, -30.1873046875)],
                knots=[0.403481111, 0.403481111, 0.403481111, 0.403481111, 0.5, 0.5, 0.5, 0.5], degree=3))
            Line((-8.1359375, -30.1873046875), (-8.1359375, -30.1625))
        make_face()
        with BuildLine():
            Line((-6.8241157772, -30.1625), (-8.1359375, -30.1625))
            Line((-8.1359375, -30.1625), (-8.1359375, -30.1873046875))
            add(Edge.make_bspline(
                [(-8.1359375, -30.1873046875), (-7.6862010464, -30.1873046875), (-7.2364645928, -30.1795465798), (-6.8241157772, -30.1625)],
                knots=[0.5, 0.5, 0.5, 0.5, 0.5965188889, 0.5965188889, 0.5965188889, 0.5965188889], degree=3))
        make_face()
        with BuildLine():
            Line((-31.5515625, -30.1625), (-32.2650261503, -30.1625))
            add(Edge.make_bspline(
                [(-32.2650261503, -30.1625), (-32.0315636815, -30.177918798), (-31.7915630907, -30.1873046875), (-31.5515625, -30.1873046875)],
                knots=[0.4374082034, 0.4374082034, 0.4374082034, 0.4374082034, 0.5, 0.5, 0.5, 0.5], degree=3))
            Line((-31.5515625, -30.1873046875), (-31.5515625, -30.1625))
        make_face()
        with BuildLine():
            Line((-30.8380988479, -30.1625), (-31.5515625, -30.1625))
            Line((-31.5515625, -30.1625), (-31.5515625, -30.1873046875))
            add(Edge.make_bspline(
                [(-31.5515625, -30.1873046875), (-31.3115619086, -30.1873046875), (-31.0715613172, -30.1779187981), (-30.8380988479, -30.1625)],
                knots=[0.5, 0.5, 0.5, 0.5, 0.5625917967, 0.5625917967, 0.5625917967, 0.5625917967], degree=3))
        make_face()
    extrude(amount=F1_DEPTH)


solid = f1.part
